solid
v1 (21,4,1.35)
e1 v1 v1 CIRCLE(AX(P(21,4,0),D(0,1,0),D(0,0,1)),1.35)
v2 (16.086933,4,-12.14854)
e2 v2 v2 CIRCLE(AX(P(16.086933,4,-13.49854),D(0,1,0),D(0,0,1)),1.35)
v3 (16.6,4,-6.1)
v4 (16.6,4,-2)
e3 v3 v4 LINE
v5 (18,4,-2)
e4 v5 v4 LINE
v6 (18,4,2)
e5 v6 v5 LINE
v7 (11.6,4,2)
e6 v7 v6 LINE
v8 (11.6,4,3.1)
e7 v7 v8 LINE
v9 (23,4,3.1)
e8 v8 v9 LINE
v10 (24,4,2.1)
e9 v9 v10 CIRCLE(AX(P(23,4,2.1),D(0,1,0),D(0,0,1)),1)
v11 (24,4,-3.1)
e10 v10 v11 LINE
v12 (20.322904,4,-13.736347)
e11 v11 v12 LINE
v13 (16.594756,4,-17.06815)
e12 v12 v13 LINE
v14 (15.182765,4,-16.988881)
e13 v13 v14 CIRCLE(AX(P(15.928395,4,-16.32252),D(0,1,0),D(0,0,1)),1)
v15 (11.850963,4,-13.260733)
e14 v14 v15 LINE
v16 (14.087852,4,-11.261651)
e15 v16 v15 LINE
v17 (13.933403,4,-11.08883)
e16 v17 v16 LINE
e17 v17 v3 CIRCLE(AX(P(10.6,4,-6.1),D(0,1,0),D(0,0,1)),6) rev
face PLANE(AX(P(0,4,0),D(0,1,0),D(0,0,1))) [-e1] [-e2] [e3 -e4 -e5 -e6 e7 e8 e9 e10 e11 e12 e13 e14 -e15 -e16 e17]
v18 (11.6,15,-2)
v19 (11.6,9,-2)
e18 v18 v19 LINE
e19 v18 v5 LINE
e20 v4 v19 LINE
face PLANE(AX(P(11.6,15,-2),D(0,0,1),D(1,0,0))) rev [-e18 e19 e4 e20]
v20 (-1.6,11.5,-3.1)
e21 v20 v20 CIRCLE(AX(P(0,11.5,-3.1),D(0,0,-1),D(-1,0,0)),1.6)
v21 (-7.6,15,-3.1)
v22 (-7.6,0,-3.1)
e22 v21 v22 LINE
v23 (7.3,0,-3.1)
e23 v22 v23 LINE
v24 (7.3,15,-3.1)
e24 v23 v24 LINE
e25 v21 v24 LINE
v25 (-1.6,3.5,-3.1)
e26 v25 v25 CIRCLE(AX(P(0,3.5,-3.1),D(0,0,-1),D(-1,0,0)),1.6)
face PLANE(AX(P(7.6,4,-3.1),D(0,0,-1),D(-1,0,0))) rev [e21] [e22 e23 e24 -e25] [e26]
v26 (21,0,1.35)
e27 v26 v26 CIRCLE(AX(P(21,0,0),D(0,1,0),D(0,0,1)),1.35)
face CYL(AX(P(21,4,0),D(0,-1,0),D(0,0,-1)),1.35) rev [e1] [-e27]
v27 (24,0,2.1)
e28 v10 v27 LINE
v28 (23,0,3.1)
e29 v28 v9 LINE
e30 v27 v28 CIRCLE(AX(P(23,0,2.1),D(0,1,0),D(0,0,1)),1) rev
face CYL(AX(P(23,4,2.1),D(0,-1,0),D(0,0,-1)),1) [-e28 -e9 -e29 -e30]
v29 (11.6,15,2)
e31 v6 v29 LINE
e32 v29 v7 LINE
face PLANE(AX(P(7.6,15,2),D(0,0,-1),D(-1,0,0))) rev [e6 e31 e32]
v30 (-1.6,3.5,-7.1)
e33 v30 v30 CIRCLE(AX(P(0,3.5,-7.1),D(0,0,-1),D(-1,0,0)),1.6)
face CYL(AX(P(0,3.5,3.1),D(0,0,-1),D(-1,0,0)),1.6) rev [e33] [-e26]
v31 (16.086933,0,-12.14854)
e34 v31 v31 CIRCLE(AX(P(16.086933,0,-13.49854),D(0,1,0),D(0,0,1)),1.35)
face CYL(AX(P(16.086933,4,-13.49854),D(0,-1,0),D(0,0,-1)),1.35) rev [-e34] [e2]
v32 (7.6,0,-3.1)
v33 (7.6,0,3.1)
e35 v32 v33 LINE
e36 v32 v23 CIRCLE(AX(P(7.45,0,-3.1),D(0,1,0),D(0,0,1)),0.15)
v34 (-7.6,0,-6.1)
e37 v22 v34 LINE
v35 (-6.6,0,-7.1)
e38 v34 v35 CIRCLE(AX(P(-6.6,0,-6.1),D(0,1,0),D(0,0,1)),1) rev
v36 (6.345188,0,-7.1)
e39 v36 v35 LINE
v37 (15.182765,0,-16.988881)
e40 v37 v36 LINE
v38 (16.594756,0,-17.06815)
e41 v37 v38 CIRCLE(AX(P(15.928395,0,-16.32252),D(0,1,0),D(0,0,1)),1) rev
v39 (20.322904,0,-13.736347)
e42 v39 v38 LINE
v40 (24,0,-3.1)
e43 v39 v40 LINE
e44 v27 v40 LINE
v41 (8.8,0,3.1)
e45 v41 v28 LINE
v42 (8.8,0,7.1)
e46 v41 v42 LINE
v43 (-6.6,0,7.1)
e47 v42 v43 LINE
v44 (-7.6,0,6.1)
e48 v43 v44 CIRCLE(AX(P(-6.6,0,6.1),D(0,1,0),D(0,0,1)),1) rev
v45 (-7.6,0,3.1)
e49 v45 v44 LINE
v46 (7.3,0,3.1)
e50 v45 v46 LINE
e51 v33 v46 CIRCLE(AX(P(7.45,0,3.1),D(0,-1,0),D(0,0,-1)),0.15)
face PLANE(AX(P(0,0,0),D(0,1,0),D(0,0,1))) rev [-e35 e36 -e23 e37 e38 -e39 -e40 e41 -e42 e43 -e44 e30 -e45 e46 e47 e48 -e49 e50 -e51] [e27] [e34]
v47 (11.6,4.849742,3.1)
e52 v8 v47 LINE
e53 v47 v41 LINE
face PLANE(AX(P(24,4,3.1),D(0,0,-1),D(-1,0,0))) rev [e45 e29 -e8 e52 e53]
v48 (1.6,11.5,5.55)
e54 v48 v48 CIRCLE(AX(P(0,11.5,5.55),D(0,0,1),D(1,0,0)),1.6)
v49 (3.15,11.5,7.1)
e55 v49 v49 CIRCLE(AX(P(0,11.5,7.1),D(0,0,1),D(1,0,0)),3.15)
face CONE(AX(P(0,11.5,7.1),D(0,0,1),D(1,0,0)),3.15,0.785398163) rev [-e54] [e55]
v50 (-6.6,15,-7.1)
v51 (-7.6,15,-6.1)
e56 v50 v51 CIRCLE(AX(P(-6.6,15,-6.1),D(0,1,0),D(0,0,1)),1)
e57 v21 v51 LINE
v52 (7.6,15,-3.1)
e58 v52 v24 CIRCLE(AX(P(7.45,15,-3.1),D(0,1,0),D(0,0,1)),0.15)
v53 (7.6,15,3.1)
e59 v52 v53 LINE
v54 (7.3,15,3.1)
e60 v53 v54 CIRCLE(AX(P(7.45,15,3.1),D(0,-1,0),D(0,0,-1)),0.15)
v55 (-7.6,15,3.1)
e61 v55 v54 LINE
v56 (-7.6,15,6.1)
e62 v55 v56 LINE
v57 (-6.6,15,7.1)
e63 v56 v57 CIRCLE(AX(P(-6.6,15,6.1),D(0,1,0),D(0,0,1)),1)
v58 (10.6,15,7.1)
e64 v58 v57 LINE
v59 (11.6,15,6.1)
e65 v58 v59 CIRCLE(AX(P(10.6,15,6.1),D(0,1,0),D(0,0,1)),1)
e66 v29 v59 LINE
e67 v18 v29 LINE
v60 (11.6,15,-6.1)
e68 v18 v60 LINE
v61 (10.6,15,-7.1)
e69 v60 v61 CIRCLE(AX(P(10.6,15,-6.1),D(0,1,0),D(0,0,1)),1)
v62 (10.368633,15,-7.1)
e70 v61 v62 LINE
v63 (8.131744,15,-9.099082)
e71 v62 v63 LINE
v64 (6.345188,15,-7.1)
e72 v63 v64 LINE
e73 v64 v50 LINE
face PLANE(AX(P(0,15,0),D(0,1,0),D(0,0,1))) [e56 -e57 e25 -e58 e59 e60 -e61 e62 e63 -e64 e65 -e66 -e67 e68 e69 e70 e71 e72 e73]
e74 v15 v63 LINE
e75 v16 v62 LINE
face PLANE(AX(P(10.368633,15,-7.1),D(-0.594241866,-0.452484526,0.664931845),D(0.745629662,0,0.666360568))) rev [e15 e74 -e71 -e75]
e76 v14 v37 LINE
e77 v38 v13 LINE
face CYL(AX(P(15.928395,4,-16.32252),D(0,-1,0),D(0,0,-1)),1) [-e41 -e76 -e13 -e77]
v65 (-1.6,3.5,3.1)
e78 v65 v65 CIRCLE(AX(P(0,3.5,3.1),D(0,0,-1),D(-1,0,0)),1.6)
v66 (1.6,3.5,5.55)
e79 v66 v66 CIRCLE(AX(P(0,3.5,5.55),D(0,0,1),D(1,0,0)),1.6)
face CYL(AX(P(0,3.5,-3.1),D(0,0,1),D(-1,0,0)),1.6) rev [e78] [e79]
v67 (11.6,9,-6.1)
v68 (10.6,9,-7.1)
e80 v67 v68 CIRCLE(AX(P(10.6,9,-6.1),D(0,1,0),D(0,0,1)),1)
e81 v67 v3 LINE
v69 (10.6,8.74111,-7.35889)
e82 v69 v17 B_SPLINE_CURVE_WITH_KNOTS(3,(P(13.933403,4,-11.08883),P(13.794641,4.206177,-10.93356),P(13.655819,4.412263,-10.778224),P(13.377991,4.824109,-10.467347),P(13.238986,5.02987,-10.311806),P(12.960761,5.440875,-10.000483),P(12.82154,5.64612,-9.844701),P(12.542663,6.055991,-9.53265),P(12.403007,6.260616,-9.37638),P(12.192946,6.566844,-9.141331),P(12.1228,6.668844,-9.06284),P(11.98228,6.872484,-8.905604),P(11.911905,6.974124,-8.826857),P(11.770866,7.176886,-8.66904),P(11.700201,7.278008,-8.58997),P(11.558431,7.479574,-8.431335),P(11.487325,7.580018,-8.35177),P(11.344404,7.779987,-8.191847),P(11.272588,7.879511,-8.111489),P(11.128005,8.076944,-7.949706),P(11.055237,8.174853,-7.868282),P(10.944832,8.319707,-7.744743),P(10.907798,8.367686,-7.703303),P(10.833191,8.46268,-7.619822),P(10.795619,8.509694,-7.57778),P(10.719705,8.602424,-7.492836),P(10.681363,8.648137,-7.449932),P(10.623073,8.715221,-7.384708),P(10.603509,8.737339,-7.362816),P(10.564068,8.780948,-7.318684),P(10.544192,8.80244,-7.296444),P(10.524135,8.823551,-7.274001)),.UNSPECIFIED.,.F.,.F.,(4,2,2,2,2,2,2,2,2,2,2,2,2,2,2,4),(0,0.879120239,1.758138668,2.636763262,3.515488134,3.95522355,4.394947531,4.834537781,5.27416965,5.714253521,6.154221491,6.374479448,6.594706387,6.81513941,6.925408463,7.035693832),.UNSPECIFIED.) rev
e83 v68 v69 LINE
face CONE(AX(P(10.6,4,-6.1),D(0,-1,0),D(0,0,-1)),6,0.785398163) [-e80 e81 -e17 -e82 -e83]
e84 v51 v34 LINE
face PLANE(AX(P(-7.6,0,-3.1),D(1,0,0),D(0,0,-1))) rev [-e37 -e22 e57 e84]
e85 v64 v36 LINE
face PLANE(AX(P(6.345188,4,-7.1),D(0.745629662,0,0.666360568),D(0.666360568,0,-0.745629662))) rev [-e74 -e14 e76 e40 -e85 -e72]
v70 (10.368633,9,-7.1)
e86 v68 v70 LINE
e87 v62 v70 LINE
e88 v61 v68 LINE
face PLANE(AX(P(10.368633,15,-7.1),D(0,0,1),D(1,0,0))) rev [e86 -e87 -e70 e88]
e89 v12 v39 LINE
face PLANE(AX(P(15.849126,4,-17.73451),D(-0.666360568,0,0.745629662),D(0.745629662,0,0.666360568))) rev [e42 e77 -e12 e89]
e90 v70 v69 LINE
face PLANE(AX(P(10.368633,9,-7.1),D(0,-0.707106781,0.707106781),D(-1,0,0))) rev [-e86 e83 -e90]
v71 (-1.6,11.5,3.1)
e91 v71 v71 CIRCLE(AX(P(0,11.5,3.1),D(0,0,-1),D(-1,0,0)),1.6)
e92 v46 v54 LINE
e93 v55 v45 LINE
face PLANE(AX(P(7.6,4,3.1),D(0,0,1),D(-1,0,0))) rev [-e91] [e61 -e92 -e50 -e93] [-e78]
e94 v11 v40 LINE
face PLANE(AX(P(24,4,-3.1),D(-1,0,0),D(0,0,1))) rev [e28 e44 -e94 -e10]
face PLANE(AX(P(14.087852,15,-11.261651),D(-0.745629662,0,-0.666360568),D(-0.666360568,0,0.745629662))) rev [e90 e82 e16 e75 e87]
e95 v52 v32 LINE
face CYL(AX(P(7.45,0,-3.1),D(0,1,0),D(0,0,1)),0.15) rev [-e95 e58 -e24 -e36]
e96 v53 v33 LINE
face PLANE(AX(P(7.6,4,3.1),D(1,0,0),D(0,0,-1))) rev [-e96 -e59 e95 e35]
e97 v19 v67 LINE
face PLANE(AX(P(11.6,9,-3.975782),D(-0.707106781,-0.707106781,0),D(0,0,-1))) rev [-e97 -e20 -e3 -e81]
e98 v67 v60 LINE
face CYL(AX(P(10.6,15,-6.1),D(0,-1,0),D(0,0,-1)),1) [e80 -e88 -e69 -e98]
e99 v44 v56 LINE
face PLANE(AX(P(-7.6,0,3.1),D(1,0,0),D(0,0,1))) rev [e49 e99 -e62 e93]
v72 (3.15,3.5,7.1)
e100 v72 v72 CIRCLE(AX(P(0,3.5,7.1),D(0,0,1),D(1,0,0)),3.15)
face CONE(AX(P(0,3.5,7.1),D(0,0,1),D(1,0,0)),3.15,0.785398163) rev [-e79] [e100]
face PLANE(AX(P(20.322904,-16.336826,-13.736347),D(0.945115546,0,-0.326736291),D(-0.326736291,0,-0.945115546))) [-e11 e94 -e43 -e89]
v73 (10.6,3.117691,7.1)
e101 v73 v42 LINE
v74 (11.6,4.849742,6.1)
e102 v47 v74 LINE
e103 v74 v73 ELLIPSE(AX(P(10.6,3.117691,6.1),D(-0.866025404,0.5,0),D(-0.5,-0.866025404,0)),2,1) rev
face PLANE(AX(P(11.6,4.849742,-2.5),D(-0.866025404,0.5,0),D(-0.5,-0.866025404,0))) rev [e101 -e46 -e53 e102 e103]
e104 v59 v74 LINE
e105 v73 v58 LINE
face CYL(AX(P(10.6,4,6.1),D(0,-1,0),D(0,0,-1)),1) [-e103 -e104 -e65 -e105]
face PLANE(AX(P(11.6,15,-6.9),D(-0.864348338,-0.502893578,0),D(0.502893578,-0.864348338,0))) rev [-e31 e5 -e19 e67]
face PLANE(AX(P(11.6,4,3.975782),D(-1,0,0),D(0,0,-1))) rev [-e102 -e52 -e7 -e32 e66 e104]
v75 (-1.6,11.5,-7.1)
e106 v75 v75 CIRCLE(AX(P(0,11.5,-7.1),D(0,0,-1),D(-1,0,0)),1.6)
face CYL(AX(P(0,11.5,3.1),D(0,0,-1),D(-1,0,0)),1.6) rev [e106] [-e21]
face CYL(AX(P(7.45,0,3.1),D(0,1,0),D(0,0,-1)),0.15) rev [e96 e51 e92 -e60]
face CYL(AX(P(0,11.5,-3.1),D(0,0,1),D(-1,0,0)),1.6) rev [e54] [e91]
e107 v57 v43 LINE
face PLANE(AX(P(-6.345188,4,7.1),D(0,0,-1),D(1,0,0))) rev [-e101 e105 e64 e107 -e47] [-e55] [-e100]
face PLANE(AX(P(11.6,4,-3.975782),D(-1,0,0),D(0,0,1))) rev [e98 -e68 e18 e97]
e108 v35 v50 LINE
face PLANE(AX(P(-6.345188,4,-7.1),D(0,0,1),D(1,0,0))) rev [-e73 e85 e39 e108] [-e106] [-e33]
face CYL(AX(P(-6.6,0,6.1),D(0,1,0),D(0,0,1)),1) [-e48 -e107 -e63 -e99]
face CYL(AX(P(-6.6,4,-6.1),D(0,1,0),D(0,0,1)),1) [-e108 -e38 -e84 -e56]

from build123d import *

# Parameters (mm, degrees)
SKETCH_1_R                   = 1.35
EXTRUDE_1_DEPTH              = 4
EXTRUDE_2_DEPTH              = 11
CUT_EXTRUDE_1_DEPTH          = 10
CUT_EXTRUDE_2_DEPTH          = 3
SKETCH_6_R                   = 1.6
CUT_EXTRUDE_3_DEPTH          = 31.233967875
SKETCH_7_R                   = 0.15
CUT_EXTRUDE_4_DEPTH          = 34.399294341
CUT_EXTRUDE_5_DEPTH          = 34.399294341
CUT_EXTRUDE_6_DEPTH          = 34.399294341
HOLE_WIZARD_M3_3_D           = 3.2
HOLE_WIZARD_M3_3_CSINK_D     = 6.3
HOLE_WIZARD_M3_3_CSINK_ANGLE = 90
EXTRUDE_3_DEPTH              = 4
FILLET_1_R                   = 1
CHAMFER_1_SIZE               = 5
CUT_EXTRUDE_7_DEPTH          = 4


with BuildPart() as part:
    # 草图1 → 凸台-拉伸1 (new body)
    with BuildSketch(Plane(origin=(0, 0, 0), x_dir=(1, 0, 0), z_dir=(0, 1, 0))):
        Polygon((7.6, -3.1), (7.6, 3.1), (-7.6, 3.1), (-7.6, -3.1), (-24, -3.1), (-24, 3.1), (-11.6, 3.1), (-11.6, 3.975781599), (-20.322903997, 13.736347087), (-15.849126022, 17.734510495), (-6.345187525, 7.1), (6.345187525, 7.1), (15.849126022, 17.734510495), (20.322903997, 13.736347087), (11.6, 3.975781599), (11.6, 3.1), (24, 3.1), (24, -3.1), align=None)
        with Locations(Location((-21, 0, 0), (0, 0, 270))):
            Circle(SKETCH_1_R, mode=Mode.SUBTRACT)
        with Locations(Location((-16.086933305, 13.498539803, 0), (0, 0, 270))):
            Circle(SKETCH_1_R, mode=Mode.SUBTRACT)
        with Locations(Location((16.086933305, 13.498539803, 0), (0, 0, 270))):
            Circle(SKETCH_1_R, mode=Mode.SUBTRACT)
        with Locations(Location((21, 0, 0), (0, 0, 270))):
            Circle(SKETCH_1_R, mode=Mode.SUBTRACT)
    extrude(amount=EXTRUDE_1_DEPTH)

    # 草图3 → 凸台-拉伸2 (add)
    with BuildSketch(Plane(origin=(0, 4, 0), x_dir=(1, 0, 0), z_dir=(0, 1, 0))):
        Polygon((-6.345187525, 7.1), (6.345187525, 7.1), (11.850962614, 13.26073252), (14.087851602, 11.261650816), (10.36863261, 7.1), (11.6, 7.1), (11.6, 2), (18, 2), (18, -2), (7.6, -2), (7.6, 3.1), (-7.6, 3.1), (-7.6, -3.1), (-18, -3.1), (-18, -0.1), (-11.6, -0.1), (-11.6, 7.1), (-10.36863261, 7.1), (-14.087851602, 11.261650816), (-11.850962614, 13.26073252), align=None)
    extrude(amount=EXTRUDE_2_DEPTH)

    # 草图4 → 切除-拉伸1 (cut)
    with BuildSketch(Plane.XY.offset(3.1)):
        Polygon((-11.6, 15), (-18, 4), (-18, 15), align=None)
        Polygon((18, 4), (18, 15), (11.6, 15), align=None)
    extrude(amount=-CUT_EXTRUDE_1_DEPTH, mode=Mode.SUBTRACT)

    # 草图5 → 切除-拉伸2 (cut)
    with BuildSketch(Plane(origin=(0, 0, 0), x_dir=(-0.6663605679521429, 0, 0.745629662418615), z_dir=(-0.745629662418615, 0, -0.6663605679521429))):
        Polygon((-12.203218518, 15), (-17.784609691, 4), (-17.784609691, 15), align=None)
    cut_extrude_2 = extrude(amount=-CUT_EXTRUDE_2_DEPTH, mode=Mode.SUBTRACT)

    # 镜向2: 切除-拉伸2 across plane
    add(cut_extrude_2.mirror(Plane(origin=(0, 0, 0), x_dir=(0, 0, 1), z_dir=(1, 0, 0))), mode=Mode.SUBTRACT)

    # 草图6 → 切除-拉伸3 (cut, through all)
    with BuildSketch(Plane(origin=(0, 0, -7.1), x_dir=(-1, 0, 0), z_dir=(0, 0, -1))):
        with Locations((0, 11.5)):
            Circle(SKETCH_6_R)
        with Locations((0, 3.5)):
            Circle(SKETCH_6_R)
    extrude(amount=-CUT_EXTRUDE_3_DEPTH, mode=Mode.SUBTRACT)

    # 草图7 → 切除-拉伸4 (cut, through all)
    with BuildSketch(Plane(origin=(0, 15, 0), x_dir=(1, 0, 0), z_dir=(0, 1, 0))):
        with Locations((7.45, 3.1)):
            Circle(SKETCH_7_R)
    extrude(amount=-CUT_EXTRUDE_4_DEPTH, mode=Mode.SUBTRACT)

    # 草图8 → 切除-拉伸5 (cut, through all)
    with BuildSketch(Plane(origin=(0, 15, 0), x_dir=(1, 0, 0), z_dir=(0, 1, 0))):
        Polygon((-7.6, 24.734510495), (-31, 24.734510495), (-31, -10.1), (-7.6, -10.1), (-7.6, 3.1), (-7.6, 7.1), (-2.6, 7.1), (-2.6, 24.734510495), align=None)
    extrude(amount=-CUT_EXTRUDE_5_DEPTH, mode=Mode.SUBTRACT)

    # 镜向3: part across plane


with BuildPart() as part_1:
    add(part.part)
    add(part.part.mirror(Plane.XY))

    # 草图9 → 切除-拉伸6 (cut, through all)
    with BuildSketch(Plane(origin=(0, 15, 0), x_dir=(1, 0, 0), z_dir=(0, 1, 0))):
        Polygon((6.345187525, -7.1), (11.6, -7.1), (11.6, -3.975781599), (21.345187525, -3.975781599), (21.345187525, -18.975781599), (6.345187525, -18.975781599), align=None)
    extrude(amount=-CUT_EXTRUDE_6_DEPTH, mode=Mode.SUBTRACT)

    # M3 锥坑高头螺钉的锥形沉头孔3 (through all)
    with Locations(Plane(origin=(0, 11.5, 7.1), x_dir=(1, 0, 0), z_dir=(0, 0, 1))):
        with Locations((0, 0), (0, -8)):
            CounterSinkHole(HOLE_WIZARD_M3_3_D / 2, HOLE_WIZARD_M3_3_CSINK_D / 2, counter_sink_angle=HOLE_WIZARD_M3_3_CSINK_ANGLE)

    # 草图12 → 凸台-拉伸3 (add)
    with BuildSketch(Plane(origin=(0, 4, 0), x_dir=(1, 0, 0), z_dir=(0, 1, 0))):
        Polygon((11.6, 3.975781599), (20.322903997, 13.736347087), (24, 3.1), (11.6, 3.1), align=None)
    extrude(amount=-EXTRUDE_3_DEPTH)

    # 圆角1
    fillet_1_edges = [part_1.edges().sort_by_distance(p)[0] for p in [
        (-7.6, 7.5, -7.1),
        (11.6, 7.5, 7.1),
        (-7.6, 7.5, 7.1),
        (15.849126022, 2, -17.734510495),
        (24, 2, 3.1),
        (11.6, 9.5, -7.1),
    ]]
    fillet(fillet_1_edges, radius=FILLET_1_R)

    # 倒角1
    # the kernel refuses this chamfer: 5 mm, written as the material it adds along each edge
    with BuildSketch(Plane(origin=(-2.48978233, 4, -7.1), x_dir=(0, -0.02749587661058641, -0.9996219169112968), z_dir=(1, 0, 0))) as chamfer_1_piece_1_section:
        Polygon((CHAMFER_1_SIZE * 0.999621916911, CHAMFER_1_SIZE * 0.0274958766106), (-CHAMFER_1_SIZE * 0.0274958766106, CHAMFER_1_SIZE * 0.999621916911), (0, 0), align=None)
    chamfer_1_piece_1 = extrude(amount=13.08978233, mode=Mode.PRIVATE)
    chamfer_1_piece_1 = split(chamfer_1_piece_1, bisect_by=Plane(origin=(10.479473381, 6.457230488, -7.224026197), z_dir=(0.7456296624186146, 0, 0.6663605679521433)), keep=Keep.TOP, mode=Mode.PRIVATE)
    add(chamfer_1_piece_1)
    with BuildSketch(Plane(origin=(10.6, 4, -6.1), x_dir=(0, 0, -1), z_dir=(-1, 0, 0))) as chamfer_1_piece_2_section:
        Polygon((1 + CHAMFER_1_SIZE, 0), (1, -CHAMFER_1_SIZE), (1, 0), align=None)
    chamfer_1_piece_2 = revolve(axis=Axis((10.6, 4, -6.1), (0, -1, 0)), revolution_arc=90, mode=Mode.PRIVATE)
    chamfer_1_piece_2 = split(chamfer_1_piece_2, bisect_by=Plane(origin=(10.960493571, 6.207373744, -7.762267712), z_dir=(0.7456296624186146, 0, 0.6663605679521433)), keep=Keep.TOP, mode=Mode.PRIVATE)
    add(chamfer_1_piece_2)
    with BuildSketch(Plane(origin=(11.6, 4, -2), x_dir=(0.9996219169112968, -0.027495876610586396, 0), z_dir=(0, 0, -1))) as chamfer_1_piece_3:
        Polygon((CHAMFER_1_SIZE * 0.999621916911, -CHAMFER_1_SIZE * 0.0274958766106), (-CHAMFER_1_SIZE * 0.0274958766106, -CHAMFER_1_SIZE * 0.999621916911), (0, 0), align=None)
    extrude(amount=4.1)

    # 草图13 → 切除-拉伸7 (cut)
    with BuildSketch(Plane.XY.offset(7.1)):
        Polygon((11.6, 4.849742261), (8.8, 0), (11.6, 0), align=None)
    extrude(amount=-CUT_EXTRUDE_7_DEPTH, mode=Mode.SUBTRACT)


solid = part_1.part
